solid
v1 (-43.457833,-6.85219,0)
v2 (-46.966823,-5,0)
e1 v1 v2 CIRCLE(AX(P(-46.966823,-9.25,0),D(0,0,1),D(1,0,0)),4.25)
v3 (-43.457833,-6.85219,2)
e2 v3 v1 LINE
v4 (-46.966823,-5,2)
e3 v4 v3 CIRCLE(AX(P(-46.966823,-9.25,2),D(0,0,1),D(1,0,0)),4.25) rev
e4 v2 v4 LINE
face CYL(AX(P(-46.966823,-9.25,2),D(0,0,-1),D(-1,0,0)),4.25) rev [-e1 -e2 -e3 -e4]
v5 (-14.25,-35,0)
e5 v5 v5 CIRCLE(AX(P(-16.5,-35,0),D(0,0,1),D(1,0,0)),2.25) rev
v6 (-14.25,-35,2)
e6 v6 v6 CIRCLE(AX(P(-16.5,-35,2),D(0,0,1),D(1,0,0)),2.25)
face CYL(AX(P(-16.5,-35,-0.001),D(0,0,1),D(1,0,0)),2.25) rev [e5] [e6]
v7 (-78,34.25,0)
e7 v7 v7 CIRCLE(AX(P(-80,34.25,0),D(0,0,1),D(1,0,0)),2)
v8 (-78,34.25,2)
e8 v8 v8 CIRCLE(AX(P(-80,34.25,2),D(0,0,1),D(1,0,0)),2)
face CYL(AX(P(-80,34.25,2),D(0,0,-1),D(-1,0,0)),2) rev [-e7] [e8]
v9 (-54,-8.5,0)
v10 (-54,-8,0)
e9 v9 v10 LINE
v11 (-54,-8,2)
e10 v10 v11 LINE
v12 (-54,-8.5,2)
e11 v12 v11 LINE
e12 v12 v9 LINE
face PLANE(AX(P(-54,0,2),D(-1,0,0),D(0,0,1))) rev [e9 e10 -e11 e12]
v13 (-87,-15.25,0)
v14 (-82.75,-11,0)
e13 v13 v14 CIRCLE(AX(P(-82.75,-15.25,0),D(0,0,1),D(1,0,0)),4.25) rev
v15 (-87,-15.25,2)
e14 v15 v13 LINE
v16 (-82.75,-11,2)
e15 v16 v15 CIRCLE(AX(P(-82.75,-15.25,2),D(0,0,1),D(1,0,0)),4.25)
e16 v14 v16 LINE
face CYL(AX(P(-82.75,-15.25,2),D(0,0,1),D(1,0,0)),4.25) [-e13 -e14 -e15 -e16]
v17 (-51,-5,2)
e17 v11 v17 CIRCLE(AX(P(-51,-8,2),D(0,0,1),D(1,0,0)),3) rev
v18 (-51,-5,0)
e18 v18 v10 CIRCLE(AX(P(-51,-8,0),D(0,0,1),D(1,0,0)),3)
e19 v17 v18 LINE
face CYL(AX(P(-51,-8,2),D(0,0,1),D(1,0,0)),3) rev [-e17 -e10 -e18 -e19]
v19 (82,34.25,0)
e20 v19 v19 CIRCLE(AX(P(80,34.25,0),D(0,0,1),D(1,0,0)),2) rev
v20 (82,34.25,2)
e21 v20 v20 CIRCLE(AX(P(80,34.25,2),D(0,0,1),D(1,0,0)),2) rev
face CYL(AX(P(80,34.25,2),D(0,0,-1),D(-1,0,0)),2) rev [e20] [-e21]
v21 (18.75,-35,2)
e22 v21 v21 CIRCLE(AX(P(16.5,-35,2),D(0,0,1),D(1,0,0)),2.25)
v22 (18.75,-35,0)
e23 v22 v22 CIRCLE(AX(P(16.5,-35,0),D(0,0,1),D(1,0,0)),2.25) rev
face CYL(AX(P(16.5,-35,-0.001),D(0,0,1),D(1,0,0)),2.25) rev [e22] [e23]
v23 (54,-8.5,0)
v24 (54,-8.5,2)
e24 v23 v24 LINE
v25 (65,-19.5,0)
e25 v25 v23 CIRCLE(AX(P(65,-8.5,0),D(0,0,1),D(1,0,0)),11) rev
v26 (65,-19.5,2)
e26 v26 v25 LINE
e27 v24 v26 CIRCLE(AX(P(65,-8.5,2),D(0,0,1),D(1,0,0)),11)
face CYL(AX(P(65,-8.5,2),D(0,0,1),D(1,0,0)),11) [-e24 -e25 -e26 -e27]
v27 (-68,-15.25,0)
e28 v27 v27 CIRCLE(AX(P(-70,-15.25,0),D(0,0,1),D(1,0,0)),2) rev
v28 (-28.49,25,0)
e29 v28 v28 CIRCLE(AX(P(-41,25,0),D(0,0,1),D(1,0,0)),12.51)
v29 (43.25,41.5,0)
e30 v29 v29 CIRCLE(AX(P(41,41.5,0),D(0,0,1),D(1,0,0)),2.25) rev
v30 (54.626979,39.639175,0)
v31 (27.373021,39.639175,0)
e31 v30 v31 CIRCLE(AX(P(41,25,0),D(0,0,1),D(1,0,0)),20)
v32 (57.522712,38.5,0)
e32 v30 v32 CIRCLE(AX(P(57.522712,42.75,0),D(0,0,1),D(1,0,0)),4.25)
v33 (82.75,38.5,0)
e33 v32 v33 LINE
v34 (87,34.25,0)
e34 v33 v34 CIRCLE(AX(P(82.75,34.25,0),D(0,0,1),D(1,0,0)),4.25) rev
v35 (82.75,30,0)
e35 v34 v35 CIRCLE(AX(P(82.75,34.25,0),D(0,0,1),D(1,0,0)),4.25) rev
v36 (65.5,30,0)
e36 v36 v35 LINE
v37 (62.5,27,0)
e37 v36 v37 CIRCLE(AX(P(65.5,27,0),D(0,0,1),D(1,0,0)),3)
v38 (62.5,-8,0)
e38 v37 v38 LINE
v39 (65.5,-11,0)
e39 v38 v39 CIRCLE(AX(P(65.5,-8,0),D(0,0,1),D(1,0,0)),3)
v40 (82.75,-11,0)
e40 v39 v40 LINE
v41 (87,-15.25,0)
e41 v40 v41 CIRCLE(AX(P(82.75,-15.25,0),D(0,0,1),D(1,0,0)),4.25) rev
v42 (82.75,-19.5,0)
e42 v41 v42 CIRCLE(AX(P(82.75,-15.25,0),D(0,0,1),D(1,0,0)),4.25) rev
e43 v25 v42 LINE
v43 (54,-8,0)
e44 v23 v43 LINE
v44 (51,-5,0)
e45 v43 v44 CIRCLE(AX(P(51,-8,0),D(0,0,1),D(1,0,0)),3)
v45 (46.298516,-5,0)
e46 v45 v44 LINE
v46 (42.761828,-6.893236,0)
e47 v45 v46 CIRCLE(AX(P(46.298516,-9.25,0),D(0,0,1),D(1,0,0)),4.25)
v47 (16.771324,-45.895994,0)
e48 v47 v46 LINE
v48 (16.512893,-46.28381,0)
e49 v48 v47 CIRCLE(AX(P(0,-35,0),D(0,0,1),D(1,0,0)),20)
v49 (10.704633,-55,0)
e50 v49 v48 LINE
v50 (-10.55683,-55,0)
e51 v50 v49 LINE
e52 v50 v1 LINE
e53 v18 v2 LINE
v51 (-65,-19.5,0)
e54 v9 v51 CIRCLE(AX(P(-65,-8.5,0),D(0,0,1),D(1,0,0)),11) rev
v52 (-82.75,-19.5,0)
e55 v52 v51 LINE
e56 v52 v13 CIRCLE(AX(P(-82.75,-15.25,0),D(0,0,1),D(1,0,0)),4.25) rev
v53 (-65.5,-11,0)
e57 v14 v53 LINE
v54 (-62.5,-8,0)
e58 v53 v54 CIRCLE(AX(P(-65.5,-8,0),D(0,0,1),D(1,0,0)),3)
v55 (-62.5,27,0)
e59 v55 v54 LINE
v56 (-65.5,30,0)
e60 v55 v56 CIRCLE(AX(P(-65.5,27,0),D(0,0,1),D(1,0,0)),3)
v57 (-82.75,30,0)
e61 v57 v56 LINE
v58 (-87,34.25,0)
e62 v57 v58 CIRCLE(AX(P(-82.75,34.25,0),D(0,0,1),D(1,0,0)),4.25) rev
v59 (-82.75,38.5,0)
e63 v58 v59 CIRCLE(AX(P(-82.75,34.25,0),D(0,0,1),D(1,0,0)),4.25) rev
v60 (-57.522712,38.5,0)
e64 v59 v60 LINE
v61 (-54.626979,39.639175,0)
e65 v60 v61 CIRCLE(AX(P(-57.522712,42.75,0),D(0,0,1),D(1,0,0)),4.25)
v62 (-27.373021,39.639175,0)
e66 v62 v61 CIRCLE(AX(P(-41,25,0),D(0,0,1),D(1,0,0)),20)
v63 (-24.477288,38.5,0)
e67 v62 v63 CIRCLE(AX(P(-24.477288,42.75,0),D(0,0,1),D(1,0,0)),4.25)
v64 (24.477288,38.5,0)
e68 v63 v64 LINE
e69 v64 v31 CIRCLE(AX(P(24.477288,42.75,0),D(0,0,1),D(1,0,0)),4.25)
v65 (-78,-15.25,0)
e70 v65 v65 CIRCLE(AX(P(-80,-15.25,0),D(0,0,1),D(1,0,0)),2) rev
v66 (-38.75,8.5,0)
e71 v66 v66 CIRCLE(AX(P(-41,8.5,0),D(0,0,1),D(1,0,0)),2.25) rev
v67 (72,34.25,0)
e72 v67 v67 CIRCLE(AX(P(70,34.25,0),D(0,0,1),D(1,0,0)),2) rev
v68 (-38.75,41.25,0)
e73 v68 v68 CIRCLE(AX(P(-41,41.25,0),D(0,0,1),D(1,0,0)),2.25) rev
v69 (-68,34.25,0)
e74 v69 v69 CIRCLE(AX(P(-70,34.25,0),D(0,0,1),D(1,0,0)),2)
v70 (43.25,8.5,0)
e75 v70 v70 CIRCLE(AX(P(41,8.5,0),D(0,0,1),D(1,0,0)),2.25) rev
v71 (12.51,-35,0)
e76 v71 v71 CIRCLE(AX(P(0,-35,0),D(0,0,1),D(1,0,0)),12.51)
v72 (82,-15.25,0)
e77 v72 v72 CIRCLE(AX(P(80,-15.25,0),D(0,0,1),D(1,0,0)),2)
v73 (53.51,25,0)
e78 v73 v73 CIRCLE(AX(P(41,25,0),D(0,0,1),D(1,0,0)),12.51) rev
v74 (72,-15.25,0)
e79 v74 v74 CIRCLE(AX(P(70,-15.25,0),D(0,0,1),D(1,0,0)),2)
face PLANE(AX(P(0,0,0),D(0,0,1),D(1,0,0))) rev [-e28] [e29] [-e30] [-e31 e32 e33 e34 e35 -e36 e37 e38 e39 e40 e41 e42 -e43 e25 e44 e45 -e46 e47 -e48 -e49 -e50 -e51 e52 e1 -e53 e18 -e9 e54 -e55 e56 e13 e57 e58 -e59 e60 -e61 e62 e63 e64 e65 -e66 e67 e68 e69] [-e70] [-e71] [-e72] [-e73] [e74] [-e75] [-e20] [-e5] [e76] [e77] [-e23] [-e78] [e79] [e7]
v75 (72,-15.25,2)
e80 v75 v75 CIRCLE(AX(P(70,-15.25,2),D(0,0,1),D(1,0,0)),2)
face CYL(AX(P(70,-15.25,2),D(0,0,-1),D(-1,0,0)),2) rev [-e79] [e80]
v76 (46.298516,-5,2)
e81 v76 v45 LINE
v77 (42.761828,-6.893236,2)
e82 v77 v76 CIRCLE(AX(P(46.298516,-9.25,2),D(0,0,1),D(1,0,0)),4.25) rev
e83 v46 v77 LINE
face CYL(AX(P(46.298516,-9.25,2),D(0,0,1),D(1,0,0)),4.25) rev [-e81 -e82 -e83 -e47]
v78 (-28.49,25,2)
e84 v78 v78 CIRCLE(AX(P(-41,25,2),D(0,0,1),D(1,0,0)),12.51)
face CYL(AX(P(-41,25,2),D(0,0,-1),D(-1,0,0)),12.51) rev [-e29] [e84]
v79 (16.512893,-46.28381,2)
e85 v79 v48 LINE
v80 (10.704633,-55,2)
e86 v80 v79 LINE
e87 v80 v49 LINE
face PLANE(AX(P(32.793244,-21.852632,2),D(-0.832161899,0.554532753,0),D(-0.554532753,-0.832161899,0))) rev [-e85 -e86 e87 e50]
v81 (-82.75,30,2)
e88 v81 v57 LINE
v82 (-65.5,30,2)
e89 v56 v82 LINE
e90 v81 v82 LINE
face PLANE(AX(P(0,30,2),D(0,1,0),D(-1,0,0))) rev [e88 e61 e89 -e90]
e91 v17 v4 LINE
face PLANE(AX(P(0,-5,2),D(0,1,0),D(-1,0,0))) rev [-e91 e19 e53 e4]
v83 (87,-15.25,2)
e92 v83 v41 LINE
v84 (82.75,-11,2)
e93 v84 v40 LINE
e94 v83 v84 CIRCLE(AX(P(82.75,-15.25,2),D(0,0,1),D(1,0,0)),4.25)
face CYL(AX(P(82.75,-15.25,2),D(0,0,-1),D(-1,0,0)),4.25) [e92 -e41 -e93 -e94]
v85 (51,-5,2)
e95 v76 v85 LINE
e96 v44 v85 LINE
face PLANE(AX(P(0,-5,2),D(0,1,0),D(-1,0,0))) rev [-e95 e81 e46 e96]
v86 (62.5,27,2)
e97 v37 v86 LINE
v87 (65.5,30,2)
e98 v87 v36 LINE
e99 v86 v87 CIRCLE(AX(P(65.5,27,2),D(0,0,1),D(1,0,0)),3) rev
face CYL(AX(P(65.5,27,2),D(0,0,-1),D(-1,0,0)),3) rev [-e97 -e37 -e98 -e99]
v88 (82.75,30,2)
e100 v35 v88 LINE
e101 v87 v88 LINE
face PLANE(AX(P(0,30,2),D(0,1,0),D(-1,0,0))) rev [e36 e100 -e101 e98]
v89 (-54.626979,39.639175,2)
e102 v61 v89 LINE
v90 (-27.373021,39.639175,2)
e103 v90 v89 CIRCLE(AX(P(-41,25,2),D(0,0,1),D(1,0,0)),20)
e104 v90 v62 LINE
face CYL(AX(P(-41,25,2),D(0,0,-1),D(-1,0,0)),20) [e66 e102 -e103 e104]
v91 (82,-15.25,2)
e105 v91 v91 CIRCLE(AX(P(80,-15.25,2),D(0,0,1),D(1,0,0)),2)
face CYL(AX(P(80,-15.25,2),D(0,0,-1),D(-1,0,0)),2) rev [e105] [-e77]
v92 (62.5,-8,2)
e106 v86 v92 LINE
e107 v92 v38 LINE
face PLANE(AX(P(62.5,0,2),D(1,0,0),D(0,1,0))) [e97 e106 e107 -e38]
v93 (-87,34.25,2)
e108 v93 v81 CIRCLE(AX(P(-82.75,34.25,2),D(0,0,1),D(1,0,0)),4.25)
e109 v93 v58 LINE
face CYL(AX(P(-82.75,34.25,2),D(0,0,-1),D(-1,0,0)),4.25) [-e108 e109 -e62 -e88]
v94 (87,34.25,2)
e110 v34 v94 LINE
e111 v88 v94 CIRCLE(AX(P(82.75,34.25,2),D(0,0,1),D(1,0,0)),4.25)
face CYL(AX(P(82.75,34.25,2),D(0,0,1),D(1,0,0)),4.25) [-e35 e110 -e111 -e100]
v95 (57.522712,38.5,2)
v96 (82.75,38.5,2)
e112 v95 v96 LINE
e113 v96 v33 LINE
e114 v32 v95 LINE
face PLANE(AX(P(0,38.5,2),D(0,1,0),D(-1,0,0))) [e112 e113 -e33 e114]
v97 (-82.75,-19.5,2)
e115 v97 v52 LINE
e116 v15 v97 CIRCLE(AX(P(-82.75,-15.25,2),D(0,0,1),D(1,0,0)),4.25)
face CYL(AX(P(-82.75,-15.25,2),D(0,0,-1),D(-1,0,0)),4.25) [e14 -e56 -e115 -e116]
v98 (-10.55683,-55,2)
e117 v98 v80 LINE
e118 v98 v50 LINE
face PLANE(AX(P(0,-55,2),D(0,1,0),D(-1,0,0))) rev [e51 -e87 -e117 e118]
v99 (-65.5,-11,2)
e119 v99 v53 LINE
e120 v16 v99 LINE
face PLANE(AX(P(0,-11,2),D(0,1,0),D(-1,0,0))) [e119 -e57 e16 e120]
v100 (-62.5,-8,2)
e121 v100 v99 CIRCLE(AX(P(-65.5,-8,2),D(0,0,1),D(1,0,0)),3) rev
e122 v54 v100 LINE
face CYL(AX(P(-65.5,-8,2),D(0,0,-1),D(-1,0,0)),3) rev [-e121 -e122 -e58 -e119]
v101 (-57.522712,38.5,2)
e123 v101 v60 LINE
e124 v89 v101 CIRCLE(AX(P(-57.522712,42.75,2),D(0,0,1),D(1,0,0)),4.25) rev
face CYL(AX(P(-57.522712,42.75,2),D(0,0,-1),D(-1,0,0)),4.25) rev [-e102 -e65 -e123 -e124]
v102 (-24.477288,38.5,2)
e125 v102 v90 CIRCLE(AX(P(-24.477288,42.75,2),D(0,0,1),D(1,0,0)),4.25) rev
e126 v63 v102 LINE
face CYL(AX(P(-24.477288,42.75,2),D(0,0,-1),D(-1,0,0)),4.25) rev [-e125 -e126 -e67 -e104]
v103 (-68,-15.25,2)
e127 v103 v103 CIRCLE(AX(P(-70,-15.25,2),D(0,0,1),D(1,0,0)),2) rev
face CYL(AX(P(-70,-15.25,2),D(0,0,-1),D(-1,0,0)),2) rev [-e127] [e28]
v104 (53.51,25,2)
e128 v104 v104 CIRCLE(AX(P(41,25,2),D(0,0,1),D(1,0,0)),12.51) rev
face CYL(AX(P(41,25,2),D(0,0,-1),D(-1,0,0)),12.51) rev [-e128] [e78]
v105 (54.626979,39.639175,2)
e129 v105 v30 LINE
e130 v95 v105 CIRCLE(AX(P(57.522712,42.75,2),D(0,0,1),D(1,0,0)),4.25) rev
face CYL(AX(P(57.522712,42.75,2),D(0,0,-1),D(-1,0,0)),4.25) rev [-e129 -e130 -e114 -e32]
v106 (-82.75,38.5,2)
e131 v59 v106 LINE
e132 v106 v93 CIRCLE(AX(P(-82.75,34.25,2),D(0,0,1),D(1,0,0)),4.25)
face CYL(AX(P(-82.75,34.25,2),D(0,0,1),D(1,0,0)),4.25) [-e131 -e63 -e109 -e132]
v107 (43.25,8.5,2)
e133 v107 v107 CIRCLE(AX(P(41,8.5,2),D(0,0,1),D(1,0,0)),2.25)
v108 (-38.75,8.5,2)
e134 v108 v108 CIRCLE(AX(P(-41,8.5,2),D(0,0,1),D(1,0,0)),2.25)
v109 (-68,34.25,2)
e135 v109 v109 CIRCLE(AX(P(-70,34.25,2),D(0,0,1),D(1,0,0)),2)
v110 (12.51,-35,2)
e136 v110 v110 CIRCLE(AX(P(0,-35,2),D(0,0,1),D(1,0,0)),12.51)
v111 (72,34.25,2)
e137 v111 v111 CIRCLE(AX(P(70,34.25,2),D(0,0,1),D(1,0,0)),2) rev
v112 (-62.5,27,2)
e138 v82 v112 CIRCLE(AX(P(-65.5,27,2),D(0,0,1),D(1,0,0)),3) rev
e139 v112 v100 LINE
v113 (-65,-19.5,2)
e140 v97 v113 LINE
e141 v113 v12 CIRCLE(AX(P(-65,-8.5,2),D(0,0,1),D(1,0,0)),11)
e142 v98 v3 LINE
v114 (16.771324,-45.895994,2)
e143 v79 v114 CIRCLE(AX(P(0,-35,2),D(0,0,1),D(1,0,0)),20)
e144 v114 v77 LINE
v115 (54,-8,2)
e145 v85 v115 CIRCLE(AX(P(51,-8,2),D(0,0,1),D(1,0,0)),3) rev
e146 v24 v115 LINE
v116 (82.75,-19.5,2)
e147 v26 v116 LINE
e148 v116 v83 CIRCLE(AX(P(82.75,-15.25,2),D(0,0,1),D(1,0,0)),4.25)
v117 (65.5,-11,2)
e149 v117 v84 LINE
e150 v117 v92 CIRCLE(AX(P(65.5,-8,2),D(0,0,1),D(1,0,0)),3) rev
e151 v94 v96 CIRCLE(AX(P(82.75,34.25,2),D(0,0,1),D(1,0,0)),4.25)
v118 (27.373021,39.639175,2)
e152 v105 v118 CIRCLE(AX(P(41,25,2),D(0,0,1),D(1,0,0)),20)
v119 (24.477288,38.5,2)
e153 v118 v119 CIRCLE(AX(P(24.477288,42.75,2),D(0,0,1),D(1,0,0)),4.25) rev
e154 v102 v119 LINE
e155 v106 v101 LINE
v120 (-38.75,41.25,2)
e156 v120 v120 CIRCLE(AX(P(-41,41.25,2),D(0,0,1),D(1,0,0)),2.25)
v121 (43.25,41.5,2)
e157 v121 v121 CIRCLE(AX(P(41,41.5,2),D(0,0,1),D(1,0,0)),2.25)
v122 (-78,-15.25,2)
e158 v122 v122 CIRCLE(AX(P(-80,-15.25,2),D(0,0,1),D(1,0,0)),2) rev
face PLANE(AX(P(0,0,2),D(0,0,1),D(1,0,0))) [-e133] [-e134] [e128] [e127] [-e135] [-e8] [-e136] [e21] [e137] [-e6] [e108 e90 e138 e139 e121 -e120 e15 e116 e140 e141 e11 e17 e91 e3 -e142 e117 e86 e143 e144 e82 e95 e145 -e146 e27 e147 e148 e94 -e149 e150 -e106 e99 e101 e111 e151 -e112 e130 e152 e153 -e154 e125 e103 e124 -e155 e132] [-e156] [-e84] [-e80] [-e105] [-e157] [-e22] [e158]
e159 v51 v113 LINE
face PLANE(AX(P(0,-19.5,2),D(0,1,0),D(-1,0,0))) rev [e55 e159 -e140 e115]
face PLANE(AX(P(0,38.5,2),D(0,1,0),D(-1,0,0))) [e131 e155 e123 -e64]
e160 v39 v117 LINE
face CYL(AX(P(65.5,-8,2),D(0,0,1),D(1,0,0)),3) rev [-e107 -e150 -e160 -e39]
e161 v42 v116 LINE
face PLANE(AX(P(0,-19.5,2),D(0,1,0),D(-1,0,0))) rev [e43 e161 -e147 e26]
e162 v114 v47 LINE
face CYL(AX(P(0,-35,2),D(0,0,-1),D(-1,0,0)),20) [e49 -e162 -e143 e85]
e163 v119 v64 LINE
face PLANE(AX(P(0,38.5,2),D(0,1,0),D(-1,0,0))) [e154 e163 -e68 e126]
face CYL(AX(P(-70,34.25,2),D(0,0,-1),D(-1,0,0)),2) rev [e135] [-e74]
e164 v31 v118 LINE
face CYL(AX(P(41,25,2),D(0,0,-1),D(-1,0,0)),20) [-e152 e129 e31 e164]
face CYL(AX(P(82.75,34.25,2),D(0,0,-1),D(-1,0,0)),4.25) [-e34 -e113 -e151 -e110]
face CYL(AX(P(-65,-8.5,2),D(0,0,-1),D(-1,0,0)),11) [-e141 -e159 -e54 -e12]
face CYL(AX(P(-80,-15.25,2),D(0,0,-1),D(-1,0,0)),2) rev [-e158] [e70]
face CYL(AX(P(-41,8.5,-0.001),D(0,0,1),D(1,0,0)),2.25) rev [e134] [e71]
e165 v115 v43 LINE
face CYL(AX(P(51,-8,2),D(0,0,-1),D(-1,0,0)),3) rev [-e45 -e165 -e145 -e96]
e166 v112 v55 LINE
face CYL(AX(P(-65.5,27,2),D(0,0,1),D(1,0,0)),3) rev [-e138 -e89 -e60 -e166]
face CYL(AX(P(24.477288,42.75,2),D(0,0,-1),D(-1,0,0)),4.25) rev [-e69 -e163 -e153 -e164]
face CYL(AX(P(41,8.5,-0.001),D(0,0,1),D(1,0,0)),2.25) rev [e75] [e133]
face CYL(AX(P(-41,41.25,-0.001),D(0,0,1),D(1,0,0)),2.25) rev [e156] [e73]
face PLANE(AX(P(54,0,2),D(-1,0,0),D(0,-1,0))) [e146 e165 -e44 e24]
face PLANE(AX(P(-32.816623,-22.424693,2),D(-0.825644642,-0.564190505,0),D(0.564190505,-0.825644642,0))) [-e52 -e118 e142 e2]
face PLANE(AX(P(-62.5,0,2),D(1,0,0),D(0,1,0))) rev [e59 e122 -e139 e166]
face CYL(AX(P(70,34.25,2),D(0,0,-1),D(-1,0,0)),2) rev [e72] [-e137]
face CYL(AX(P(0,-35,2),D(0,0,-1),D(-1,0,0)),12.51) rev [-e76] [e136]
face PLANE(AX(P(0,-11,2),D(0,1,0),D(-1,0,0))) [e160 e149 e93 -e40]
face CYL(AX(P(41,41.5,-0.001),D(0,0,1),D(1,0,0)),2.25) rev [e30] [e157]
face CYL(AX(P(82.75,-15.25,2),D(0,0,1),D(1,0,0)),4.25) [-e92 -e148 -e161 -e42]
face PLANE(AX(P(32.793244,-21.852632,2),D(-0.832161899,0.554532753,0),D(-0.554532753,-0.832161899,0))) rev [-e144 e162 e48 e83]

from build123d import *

# Parameters (mm, degrees)
SKETCH1_R           = 2
SKETCH1_R_2         = 12.51
BOSS_EXTRUDE1_DEPTH = 2
FILLET1_R           = 3
FILLET2_R           = 4.25
FILLET3_R           = 11
CUT_EXTRUDE1_REACH  = 104.947
SKETCH2_R           = 2.25


with BuildPart() as part:
    # Sketch1 → Boss-Extrude1 (new body)
    with BuildSketch(Plane.XY):
        with BuildLine():
            Line((44.023434797, -5), (54, -5))
            Line((54, -5), (54, -19.5))
            Line((54, -19.5), (87, -19.5))
            Line((87, -19.5), (87, -11))
            Line((87, -11), (62.5, -11))
            Line((62.5, -11), (62.5, 30))
            Line((62.5, 30), (87, 30))
            Line((87, 30), (87, 38.5))
            Line((87, 38.5), (55.756354563, 38.5))
            ThreePointArc((55.756354563, 38.5), (41, 45), (26.243645437, 38.5))
            Line((26.243645437, 38.5), (-26.243645437, 38.5))
            ThreePointArc((-26.243645437, 38.5), (-41, 45), (-55.756354563, 38.5))
            Line((-55.756354563, 38.5), (-87, 38.5))
            Line((-87, 38.5), (-87, 30))
            Line((-87, 30), (-62.5, 30))
            Line((-62.5, 30), (-62.5, -11))
            Line((-62.5, -11), (-87, -11))
            Line((-87, -11), (-87, -19.5))
            Line((-87, -19.5), (-54, -19.5))
            Line((-54, -19.5), (-54, -5))
            Line((-54, -5), (-44.723496399, -5))
            Line((-44.723496399, -5), (-10.556829732, -55))
            Line((-10.556829732, -55), (10.704632705, -55))
            Line((10.704632705, -55), (16.51289283, -46.283810101))
            ThreePointArc((16.51289283, -46.283810101), (16.643237983, -46.09065505), (16.771323869, -45.895994479))
            Line((16.771323869, -45.895994479), (44.023434797, -5))
        make_face()
        with Locations((-80, -15.25)):
            Circle(SKETCH1_R, mode=Mode.SUBTRACT)
        with Locations((-70, -15.25)):
            Circle(SKETCH1_R, mode=Mode.SUBTRACT)
        with Locations((0, -35)):
            Circle(SKETCH1_R_2, mode=Mode.SUBTRACT)
        with Locations((70, -15.25)):
            Circle(SKETCH1_R, mode=Mode.SUBTRACT)
        with Locations((80, -15.25)):
            Circle(SKETCH1_R, mode=Mode.SUBTRACT)
        with Locations((-80, 34.25)):
            Circle(SKETCH1_R, mode=Mode.SUBTRACT)
        with Locations((-70, 34.25)):
            Circle(SKETCH1_R, mode=Mode.SUBTRACT)
        with Locations((-41, 25)):
            Circle(SKETCH1_R_2, mode=Mode.SUBTRACT)
        with Locations((41, 25)):
            Circle(SKETCH1_R_2, mode=Mode.SUBTRACT)
        with Locations((70, 34.25)):
            Circle(SKETCH1_R, mode=Mode.SUBTRACT)
        with Locations((80, 34.25)):
            Circle(SKETCH1_R, mode=Mode.SUBTRACT)
    extrude(amount=BOSS_EXTRUDE1_DEPTH)

    # Fillet1
    fillet1_edges = [part.edges().sort_by_distance(p)[0] for p in [
        (62.5, 30, 1),
        (62.5, -11, 1),
        (54, -5, 1),
        (-54, -5, 1),
        (-62.5, -11, 1),
        (-62.5, 30, 1),
    ]]
    fillet(fillet1_edges, radius=FILLET1_R)

    # Fillet2
    fillet2_edges = [part.edges().sort_by_distance(p)[0] for p in [
        (87, 30, 1),
        (87, 38.5, 1),
        (87, -11, 1),
        (87, -19.5, 1),
        (-87, -19.5, 1),
        (-87, -11, 1),
        (-87, 30, 1),
        (-87, 38.5, 1),
        (26.243645437, 38.5, 1),
        (55.756354563, 38.5, 1),
        (-55.756354563, 38.5, 1),
        (-26.243645437, 38.5, 1),
        (44.023434797, -5, 1),
        (-44.723496399, -5, 1),
    ]]
    fillet(fillet2_edges, radius=FILLET2_R - 0.0001)  # a hair under: the kernel refuses the full size

    # Fillet3
    fillet3_edges = [part.edges().sort_by_distance(p)[0] for p in [
        (54, -19.5, 1),
        (-54, -19.5, 1),
    ]]
    fillet(fillet3_edges, radius=FILLET3_R)

    # Sketch2 → Cut-Extrude1 (cut, up to next)
    with BuildSketch(Plane.XY.offset(2), mode=Mode.PRIVATE) as cut_extrude1_sk1:
        with Locations((-41, 41.25)):
            Circle(SKETCH2_R)
    cut_extrude1_tool1 = extrude(cut_extrude1_sk1.sketch, amount=-CUT_EXTRUDE1_REACH, mode=Mode.PRIVATE) & part.part
    # Sketch2 → Cut-Extrude1 (cut, up to next)
    with BuildSketch(Plane.XY.offset(2), mode=Mode.PRIVATE) as cut_extrude1_sk2:
        with Locations((-41, 8.5)):
            Circle(SKETCH2_R)
    cut_extrude1_tool2 = extrude(cut_extrude1_sk2.sketch, amount=-CUT_EXTRUDE1_REACH, mode=Mode.PRIVATE) & part.part
    # Sketch2 → Cut-Extrude1 (cut, up to next)
    with BuildSketch(Plane.XY.offset(2), mode=Mode.PRIVATE) as cut_extrude1_sk3:
        with Locations((41, 8.5)):
            Circle(SKETCH2_R)
    cut_extrude1_tool3 = extrude(cut_extrude1_sk3.sketch, amount=-CUT_EXTRUDE1_REACH, mode=Mode.PRIVATE) & part.part
    # Sketch2 → Cut-Extrude1 (cut, up to next)
    with BuildSketch(Plane.XY.offset(2), mode=Mode.PRIVATE) as cut_extrude1_sk4:
        with Locations((41, 41.5)):
            Circle(SKETCH2_R)
    cut_extrude1_tool4 = extrude(cut_extrude1_sk4.sketch, amount=-CUT_EXTRUDE1_REACH, mode=Mode.PRIVATE) & part.part
    # Sketch2 → Cut-Extrude1 (cut, up to next)
    with BuildSketch(Plane.XY.offset(2), mode=Mode.PRIVATE) as cut_extrude1_sk5:
        with Locations((-16.5, -35)):
            Circle(SKETCH2_R)
    cut_extrude1_tool5 = extrude(cut_extrude1_sk5.sketch, amount=-CUT_EXTRUDE1_REACH, mode=Mode.PRIVATE) & part.part
    # Sketch2 → Cut-Extrude1 (cut, up to next)
    with BuildSketch(Plane.XY.offset(2), mode=Mode.PRIVATE) as cut_extrude1_sk6:
        with Locations((16.5, -35)):
            Circle(SKETCH2_R)
    cut_extrude1_tool6 = extrude(cut_extrude1_sk6.sketch, amount=-CUT_EXTRUDE1_REACH, mode=Mode.PRIVATE) & part.part
    add(cut_extrude1_tool1.solids().sort_by_distance((-41, 41.25, 2))[0], mode=Mode.SUBTRACT)
    add(cut_extrude1_tool2.solids().sort_by_distance((-41, 8.5, 2))[0], mode=Mode.SUBTRACT)
    add(cut_extrude1_tool3.solids().sort_by_distance((41, 8.5, 2))[0], mode=Mode.SUBTRACT)
    add(cut_extrude1_tool4.solids().sort_by_distance((41, 41.5, 2))[0], mode=Mode.SUBTRACT)
    add(cut_extrude1_tool5.solids().sort_by_distance((-16.5, -35, 2))[0], mode=Mode.SUBTRACT)
    add(cut_extrude1_tool6.solids().sort_by_distance((16.5, -35, 2))[0], mode=Mode.SUBTRACT)


solid = part.part
